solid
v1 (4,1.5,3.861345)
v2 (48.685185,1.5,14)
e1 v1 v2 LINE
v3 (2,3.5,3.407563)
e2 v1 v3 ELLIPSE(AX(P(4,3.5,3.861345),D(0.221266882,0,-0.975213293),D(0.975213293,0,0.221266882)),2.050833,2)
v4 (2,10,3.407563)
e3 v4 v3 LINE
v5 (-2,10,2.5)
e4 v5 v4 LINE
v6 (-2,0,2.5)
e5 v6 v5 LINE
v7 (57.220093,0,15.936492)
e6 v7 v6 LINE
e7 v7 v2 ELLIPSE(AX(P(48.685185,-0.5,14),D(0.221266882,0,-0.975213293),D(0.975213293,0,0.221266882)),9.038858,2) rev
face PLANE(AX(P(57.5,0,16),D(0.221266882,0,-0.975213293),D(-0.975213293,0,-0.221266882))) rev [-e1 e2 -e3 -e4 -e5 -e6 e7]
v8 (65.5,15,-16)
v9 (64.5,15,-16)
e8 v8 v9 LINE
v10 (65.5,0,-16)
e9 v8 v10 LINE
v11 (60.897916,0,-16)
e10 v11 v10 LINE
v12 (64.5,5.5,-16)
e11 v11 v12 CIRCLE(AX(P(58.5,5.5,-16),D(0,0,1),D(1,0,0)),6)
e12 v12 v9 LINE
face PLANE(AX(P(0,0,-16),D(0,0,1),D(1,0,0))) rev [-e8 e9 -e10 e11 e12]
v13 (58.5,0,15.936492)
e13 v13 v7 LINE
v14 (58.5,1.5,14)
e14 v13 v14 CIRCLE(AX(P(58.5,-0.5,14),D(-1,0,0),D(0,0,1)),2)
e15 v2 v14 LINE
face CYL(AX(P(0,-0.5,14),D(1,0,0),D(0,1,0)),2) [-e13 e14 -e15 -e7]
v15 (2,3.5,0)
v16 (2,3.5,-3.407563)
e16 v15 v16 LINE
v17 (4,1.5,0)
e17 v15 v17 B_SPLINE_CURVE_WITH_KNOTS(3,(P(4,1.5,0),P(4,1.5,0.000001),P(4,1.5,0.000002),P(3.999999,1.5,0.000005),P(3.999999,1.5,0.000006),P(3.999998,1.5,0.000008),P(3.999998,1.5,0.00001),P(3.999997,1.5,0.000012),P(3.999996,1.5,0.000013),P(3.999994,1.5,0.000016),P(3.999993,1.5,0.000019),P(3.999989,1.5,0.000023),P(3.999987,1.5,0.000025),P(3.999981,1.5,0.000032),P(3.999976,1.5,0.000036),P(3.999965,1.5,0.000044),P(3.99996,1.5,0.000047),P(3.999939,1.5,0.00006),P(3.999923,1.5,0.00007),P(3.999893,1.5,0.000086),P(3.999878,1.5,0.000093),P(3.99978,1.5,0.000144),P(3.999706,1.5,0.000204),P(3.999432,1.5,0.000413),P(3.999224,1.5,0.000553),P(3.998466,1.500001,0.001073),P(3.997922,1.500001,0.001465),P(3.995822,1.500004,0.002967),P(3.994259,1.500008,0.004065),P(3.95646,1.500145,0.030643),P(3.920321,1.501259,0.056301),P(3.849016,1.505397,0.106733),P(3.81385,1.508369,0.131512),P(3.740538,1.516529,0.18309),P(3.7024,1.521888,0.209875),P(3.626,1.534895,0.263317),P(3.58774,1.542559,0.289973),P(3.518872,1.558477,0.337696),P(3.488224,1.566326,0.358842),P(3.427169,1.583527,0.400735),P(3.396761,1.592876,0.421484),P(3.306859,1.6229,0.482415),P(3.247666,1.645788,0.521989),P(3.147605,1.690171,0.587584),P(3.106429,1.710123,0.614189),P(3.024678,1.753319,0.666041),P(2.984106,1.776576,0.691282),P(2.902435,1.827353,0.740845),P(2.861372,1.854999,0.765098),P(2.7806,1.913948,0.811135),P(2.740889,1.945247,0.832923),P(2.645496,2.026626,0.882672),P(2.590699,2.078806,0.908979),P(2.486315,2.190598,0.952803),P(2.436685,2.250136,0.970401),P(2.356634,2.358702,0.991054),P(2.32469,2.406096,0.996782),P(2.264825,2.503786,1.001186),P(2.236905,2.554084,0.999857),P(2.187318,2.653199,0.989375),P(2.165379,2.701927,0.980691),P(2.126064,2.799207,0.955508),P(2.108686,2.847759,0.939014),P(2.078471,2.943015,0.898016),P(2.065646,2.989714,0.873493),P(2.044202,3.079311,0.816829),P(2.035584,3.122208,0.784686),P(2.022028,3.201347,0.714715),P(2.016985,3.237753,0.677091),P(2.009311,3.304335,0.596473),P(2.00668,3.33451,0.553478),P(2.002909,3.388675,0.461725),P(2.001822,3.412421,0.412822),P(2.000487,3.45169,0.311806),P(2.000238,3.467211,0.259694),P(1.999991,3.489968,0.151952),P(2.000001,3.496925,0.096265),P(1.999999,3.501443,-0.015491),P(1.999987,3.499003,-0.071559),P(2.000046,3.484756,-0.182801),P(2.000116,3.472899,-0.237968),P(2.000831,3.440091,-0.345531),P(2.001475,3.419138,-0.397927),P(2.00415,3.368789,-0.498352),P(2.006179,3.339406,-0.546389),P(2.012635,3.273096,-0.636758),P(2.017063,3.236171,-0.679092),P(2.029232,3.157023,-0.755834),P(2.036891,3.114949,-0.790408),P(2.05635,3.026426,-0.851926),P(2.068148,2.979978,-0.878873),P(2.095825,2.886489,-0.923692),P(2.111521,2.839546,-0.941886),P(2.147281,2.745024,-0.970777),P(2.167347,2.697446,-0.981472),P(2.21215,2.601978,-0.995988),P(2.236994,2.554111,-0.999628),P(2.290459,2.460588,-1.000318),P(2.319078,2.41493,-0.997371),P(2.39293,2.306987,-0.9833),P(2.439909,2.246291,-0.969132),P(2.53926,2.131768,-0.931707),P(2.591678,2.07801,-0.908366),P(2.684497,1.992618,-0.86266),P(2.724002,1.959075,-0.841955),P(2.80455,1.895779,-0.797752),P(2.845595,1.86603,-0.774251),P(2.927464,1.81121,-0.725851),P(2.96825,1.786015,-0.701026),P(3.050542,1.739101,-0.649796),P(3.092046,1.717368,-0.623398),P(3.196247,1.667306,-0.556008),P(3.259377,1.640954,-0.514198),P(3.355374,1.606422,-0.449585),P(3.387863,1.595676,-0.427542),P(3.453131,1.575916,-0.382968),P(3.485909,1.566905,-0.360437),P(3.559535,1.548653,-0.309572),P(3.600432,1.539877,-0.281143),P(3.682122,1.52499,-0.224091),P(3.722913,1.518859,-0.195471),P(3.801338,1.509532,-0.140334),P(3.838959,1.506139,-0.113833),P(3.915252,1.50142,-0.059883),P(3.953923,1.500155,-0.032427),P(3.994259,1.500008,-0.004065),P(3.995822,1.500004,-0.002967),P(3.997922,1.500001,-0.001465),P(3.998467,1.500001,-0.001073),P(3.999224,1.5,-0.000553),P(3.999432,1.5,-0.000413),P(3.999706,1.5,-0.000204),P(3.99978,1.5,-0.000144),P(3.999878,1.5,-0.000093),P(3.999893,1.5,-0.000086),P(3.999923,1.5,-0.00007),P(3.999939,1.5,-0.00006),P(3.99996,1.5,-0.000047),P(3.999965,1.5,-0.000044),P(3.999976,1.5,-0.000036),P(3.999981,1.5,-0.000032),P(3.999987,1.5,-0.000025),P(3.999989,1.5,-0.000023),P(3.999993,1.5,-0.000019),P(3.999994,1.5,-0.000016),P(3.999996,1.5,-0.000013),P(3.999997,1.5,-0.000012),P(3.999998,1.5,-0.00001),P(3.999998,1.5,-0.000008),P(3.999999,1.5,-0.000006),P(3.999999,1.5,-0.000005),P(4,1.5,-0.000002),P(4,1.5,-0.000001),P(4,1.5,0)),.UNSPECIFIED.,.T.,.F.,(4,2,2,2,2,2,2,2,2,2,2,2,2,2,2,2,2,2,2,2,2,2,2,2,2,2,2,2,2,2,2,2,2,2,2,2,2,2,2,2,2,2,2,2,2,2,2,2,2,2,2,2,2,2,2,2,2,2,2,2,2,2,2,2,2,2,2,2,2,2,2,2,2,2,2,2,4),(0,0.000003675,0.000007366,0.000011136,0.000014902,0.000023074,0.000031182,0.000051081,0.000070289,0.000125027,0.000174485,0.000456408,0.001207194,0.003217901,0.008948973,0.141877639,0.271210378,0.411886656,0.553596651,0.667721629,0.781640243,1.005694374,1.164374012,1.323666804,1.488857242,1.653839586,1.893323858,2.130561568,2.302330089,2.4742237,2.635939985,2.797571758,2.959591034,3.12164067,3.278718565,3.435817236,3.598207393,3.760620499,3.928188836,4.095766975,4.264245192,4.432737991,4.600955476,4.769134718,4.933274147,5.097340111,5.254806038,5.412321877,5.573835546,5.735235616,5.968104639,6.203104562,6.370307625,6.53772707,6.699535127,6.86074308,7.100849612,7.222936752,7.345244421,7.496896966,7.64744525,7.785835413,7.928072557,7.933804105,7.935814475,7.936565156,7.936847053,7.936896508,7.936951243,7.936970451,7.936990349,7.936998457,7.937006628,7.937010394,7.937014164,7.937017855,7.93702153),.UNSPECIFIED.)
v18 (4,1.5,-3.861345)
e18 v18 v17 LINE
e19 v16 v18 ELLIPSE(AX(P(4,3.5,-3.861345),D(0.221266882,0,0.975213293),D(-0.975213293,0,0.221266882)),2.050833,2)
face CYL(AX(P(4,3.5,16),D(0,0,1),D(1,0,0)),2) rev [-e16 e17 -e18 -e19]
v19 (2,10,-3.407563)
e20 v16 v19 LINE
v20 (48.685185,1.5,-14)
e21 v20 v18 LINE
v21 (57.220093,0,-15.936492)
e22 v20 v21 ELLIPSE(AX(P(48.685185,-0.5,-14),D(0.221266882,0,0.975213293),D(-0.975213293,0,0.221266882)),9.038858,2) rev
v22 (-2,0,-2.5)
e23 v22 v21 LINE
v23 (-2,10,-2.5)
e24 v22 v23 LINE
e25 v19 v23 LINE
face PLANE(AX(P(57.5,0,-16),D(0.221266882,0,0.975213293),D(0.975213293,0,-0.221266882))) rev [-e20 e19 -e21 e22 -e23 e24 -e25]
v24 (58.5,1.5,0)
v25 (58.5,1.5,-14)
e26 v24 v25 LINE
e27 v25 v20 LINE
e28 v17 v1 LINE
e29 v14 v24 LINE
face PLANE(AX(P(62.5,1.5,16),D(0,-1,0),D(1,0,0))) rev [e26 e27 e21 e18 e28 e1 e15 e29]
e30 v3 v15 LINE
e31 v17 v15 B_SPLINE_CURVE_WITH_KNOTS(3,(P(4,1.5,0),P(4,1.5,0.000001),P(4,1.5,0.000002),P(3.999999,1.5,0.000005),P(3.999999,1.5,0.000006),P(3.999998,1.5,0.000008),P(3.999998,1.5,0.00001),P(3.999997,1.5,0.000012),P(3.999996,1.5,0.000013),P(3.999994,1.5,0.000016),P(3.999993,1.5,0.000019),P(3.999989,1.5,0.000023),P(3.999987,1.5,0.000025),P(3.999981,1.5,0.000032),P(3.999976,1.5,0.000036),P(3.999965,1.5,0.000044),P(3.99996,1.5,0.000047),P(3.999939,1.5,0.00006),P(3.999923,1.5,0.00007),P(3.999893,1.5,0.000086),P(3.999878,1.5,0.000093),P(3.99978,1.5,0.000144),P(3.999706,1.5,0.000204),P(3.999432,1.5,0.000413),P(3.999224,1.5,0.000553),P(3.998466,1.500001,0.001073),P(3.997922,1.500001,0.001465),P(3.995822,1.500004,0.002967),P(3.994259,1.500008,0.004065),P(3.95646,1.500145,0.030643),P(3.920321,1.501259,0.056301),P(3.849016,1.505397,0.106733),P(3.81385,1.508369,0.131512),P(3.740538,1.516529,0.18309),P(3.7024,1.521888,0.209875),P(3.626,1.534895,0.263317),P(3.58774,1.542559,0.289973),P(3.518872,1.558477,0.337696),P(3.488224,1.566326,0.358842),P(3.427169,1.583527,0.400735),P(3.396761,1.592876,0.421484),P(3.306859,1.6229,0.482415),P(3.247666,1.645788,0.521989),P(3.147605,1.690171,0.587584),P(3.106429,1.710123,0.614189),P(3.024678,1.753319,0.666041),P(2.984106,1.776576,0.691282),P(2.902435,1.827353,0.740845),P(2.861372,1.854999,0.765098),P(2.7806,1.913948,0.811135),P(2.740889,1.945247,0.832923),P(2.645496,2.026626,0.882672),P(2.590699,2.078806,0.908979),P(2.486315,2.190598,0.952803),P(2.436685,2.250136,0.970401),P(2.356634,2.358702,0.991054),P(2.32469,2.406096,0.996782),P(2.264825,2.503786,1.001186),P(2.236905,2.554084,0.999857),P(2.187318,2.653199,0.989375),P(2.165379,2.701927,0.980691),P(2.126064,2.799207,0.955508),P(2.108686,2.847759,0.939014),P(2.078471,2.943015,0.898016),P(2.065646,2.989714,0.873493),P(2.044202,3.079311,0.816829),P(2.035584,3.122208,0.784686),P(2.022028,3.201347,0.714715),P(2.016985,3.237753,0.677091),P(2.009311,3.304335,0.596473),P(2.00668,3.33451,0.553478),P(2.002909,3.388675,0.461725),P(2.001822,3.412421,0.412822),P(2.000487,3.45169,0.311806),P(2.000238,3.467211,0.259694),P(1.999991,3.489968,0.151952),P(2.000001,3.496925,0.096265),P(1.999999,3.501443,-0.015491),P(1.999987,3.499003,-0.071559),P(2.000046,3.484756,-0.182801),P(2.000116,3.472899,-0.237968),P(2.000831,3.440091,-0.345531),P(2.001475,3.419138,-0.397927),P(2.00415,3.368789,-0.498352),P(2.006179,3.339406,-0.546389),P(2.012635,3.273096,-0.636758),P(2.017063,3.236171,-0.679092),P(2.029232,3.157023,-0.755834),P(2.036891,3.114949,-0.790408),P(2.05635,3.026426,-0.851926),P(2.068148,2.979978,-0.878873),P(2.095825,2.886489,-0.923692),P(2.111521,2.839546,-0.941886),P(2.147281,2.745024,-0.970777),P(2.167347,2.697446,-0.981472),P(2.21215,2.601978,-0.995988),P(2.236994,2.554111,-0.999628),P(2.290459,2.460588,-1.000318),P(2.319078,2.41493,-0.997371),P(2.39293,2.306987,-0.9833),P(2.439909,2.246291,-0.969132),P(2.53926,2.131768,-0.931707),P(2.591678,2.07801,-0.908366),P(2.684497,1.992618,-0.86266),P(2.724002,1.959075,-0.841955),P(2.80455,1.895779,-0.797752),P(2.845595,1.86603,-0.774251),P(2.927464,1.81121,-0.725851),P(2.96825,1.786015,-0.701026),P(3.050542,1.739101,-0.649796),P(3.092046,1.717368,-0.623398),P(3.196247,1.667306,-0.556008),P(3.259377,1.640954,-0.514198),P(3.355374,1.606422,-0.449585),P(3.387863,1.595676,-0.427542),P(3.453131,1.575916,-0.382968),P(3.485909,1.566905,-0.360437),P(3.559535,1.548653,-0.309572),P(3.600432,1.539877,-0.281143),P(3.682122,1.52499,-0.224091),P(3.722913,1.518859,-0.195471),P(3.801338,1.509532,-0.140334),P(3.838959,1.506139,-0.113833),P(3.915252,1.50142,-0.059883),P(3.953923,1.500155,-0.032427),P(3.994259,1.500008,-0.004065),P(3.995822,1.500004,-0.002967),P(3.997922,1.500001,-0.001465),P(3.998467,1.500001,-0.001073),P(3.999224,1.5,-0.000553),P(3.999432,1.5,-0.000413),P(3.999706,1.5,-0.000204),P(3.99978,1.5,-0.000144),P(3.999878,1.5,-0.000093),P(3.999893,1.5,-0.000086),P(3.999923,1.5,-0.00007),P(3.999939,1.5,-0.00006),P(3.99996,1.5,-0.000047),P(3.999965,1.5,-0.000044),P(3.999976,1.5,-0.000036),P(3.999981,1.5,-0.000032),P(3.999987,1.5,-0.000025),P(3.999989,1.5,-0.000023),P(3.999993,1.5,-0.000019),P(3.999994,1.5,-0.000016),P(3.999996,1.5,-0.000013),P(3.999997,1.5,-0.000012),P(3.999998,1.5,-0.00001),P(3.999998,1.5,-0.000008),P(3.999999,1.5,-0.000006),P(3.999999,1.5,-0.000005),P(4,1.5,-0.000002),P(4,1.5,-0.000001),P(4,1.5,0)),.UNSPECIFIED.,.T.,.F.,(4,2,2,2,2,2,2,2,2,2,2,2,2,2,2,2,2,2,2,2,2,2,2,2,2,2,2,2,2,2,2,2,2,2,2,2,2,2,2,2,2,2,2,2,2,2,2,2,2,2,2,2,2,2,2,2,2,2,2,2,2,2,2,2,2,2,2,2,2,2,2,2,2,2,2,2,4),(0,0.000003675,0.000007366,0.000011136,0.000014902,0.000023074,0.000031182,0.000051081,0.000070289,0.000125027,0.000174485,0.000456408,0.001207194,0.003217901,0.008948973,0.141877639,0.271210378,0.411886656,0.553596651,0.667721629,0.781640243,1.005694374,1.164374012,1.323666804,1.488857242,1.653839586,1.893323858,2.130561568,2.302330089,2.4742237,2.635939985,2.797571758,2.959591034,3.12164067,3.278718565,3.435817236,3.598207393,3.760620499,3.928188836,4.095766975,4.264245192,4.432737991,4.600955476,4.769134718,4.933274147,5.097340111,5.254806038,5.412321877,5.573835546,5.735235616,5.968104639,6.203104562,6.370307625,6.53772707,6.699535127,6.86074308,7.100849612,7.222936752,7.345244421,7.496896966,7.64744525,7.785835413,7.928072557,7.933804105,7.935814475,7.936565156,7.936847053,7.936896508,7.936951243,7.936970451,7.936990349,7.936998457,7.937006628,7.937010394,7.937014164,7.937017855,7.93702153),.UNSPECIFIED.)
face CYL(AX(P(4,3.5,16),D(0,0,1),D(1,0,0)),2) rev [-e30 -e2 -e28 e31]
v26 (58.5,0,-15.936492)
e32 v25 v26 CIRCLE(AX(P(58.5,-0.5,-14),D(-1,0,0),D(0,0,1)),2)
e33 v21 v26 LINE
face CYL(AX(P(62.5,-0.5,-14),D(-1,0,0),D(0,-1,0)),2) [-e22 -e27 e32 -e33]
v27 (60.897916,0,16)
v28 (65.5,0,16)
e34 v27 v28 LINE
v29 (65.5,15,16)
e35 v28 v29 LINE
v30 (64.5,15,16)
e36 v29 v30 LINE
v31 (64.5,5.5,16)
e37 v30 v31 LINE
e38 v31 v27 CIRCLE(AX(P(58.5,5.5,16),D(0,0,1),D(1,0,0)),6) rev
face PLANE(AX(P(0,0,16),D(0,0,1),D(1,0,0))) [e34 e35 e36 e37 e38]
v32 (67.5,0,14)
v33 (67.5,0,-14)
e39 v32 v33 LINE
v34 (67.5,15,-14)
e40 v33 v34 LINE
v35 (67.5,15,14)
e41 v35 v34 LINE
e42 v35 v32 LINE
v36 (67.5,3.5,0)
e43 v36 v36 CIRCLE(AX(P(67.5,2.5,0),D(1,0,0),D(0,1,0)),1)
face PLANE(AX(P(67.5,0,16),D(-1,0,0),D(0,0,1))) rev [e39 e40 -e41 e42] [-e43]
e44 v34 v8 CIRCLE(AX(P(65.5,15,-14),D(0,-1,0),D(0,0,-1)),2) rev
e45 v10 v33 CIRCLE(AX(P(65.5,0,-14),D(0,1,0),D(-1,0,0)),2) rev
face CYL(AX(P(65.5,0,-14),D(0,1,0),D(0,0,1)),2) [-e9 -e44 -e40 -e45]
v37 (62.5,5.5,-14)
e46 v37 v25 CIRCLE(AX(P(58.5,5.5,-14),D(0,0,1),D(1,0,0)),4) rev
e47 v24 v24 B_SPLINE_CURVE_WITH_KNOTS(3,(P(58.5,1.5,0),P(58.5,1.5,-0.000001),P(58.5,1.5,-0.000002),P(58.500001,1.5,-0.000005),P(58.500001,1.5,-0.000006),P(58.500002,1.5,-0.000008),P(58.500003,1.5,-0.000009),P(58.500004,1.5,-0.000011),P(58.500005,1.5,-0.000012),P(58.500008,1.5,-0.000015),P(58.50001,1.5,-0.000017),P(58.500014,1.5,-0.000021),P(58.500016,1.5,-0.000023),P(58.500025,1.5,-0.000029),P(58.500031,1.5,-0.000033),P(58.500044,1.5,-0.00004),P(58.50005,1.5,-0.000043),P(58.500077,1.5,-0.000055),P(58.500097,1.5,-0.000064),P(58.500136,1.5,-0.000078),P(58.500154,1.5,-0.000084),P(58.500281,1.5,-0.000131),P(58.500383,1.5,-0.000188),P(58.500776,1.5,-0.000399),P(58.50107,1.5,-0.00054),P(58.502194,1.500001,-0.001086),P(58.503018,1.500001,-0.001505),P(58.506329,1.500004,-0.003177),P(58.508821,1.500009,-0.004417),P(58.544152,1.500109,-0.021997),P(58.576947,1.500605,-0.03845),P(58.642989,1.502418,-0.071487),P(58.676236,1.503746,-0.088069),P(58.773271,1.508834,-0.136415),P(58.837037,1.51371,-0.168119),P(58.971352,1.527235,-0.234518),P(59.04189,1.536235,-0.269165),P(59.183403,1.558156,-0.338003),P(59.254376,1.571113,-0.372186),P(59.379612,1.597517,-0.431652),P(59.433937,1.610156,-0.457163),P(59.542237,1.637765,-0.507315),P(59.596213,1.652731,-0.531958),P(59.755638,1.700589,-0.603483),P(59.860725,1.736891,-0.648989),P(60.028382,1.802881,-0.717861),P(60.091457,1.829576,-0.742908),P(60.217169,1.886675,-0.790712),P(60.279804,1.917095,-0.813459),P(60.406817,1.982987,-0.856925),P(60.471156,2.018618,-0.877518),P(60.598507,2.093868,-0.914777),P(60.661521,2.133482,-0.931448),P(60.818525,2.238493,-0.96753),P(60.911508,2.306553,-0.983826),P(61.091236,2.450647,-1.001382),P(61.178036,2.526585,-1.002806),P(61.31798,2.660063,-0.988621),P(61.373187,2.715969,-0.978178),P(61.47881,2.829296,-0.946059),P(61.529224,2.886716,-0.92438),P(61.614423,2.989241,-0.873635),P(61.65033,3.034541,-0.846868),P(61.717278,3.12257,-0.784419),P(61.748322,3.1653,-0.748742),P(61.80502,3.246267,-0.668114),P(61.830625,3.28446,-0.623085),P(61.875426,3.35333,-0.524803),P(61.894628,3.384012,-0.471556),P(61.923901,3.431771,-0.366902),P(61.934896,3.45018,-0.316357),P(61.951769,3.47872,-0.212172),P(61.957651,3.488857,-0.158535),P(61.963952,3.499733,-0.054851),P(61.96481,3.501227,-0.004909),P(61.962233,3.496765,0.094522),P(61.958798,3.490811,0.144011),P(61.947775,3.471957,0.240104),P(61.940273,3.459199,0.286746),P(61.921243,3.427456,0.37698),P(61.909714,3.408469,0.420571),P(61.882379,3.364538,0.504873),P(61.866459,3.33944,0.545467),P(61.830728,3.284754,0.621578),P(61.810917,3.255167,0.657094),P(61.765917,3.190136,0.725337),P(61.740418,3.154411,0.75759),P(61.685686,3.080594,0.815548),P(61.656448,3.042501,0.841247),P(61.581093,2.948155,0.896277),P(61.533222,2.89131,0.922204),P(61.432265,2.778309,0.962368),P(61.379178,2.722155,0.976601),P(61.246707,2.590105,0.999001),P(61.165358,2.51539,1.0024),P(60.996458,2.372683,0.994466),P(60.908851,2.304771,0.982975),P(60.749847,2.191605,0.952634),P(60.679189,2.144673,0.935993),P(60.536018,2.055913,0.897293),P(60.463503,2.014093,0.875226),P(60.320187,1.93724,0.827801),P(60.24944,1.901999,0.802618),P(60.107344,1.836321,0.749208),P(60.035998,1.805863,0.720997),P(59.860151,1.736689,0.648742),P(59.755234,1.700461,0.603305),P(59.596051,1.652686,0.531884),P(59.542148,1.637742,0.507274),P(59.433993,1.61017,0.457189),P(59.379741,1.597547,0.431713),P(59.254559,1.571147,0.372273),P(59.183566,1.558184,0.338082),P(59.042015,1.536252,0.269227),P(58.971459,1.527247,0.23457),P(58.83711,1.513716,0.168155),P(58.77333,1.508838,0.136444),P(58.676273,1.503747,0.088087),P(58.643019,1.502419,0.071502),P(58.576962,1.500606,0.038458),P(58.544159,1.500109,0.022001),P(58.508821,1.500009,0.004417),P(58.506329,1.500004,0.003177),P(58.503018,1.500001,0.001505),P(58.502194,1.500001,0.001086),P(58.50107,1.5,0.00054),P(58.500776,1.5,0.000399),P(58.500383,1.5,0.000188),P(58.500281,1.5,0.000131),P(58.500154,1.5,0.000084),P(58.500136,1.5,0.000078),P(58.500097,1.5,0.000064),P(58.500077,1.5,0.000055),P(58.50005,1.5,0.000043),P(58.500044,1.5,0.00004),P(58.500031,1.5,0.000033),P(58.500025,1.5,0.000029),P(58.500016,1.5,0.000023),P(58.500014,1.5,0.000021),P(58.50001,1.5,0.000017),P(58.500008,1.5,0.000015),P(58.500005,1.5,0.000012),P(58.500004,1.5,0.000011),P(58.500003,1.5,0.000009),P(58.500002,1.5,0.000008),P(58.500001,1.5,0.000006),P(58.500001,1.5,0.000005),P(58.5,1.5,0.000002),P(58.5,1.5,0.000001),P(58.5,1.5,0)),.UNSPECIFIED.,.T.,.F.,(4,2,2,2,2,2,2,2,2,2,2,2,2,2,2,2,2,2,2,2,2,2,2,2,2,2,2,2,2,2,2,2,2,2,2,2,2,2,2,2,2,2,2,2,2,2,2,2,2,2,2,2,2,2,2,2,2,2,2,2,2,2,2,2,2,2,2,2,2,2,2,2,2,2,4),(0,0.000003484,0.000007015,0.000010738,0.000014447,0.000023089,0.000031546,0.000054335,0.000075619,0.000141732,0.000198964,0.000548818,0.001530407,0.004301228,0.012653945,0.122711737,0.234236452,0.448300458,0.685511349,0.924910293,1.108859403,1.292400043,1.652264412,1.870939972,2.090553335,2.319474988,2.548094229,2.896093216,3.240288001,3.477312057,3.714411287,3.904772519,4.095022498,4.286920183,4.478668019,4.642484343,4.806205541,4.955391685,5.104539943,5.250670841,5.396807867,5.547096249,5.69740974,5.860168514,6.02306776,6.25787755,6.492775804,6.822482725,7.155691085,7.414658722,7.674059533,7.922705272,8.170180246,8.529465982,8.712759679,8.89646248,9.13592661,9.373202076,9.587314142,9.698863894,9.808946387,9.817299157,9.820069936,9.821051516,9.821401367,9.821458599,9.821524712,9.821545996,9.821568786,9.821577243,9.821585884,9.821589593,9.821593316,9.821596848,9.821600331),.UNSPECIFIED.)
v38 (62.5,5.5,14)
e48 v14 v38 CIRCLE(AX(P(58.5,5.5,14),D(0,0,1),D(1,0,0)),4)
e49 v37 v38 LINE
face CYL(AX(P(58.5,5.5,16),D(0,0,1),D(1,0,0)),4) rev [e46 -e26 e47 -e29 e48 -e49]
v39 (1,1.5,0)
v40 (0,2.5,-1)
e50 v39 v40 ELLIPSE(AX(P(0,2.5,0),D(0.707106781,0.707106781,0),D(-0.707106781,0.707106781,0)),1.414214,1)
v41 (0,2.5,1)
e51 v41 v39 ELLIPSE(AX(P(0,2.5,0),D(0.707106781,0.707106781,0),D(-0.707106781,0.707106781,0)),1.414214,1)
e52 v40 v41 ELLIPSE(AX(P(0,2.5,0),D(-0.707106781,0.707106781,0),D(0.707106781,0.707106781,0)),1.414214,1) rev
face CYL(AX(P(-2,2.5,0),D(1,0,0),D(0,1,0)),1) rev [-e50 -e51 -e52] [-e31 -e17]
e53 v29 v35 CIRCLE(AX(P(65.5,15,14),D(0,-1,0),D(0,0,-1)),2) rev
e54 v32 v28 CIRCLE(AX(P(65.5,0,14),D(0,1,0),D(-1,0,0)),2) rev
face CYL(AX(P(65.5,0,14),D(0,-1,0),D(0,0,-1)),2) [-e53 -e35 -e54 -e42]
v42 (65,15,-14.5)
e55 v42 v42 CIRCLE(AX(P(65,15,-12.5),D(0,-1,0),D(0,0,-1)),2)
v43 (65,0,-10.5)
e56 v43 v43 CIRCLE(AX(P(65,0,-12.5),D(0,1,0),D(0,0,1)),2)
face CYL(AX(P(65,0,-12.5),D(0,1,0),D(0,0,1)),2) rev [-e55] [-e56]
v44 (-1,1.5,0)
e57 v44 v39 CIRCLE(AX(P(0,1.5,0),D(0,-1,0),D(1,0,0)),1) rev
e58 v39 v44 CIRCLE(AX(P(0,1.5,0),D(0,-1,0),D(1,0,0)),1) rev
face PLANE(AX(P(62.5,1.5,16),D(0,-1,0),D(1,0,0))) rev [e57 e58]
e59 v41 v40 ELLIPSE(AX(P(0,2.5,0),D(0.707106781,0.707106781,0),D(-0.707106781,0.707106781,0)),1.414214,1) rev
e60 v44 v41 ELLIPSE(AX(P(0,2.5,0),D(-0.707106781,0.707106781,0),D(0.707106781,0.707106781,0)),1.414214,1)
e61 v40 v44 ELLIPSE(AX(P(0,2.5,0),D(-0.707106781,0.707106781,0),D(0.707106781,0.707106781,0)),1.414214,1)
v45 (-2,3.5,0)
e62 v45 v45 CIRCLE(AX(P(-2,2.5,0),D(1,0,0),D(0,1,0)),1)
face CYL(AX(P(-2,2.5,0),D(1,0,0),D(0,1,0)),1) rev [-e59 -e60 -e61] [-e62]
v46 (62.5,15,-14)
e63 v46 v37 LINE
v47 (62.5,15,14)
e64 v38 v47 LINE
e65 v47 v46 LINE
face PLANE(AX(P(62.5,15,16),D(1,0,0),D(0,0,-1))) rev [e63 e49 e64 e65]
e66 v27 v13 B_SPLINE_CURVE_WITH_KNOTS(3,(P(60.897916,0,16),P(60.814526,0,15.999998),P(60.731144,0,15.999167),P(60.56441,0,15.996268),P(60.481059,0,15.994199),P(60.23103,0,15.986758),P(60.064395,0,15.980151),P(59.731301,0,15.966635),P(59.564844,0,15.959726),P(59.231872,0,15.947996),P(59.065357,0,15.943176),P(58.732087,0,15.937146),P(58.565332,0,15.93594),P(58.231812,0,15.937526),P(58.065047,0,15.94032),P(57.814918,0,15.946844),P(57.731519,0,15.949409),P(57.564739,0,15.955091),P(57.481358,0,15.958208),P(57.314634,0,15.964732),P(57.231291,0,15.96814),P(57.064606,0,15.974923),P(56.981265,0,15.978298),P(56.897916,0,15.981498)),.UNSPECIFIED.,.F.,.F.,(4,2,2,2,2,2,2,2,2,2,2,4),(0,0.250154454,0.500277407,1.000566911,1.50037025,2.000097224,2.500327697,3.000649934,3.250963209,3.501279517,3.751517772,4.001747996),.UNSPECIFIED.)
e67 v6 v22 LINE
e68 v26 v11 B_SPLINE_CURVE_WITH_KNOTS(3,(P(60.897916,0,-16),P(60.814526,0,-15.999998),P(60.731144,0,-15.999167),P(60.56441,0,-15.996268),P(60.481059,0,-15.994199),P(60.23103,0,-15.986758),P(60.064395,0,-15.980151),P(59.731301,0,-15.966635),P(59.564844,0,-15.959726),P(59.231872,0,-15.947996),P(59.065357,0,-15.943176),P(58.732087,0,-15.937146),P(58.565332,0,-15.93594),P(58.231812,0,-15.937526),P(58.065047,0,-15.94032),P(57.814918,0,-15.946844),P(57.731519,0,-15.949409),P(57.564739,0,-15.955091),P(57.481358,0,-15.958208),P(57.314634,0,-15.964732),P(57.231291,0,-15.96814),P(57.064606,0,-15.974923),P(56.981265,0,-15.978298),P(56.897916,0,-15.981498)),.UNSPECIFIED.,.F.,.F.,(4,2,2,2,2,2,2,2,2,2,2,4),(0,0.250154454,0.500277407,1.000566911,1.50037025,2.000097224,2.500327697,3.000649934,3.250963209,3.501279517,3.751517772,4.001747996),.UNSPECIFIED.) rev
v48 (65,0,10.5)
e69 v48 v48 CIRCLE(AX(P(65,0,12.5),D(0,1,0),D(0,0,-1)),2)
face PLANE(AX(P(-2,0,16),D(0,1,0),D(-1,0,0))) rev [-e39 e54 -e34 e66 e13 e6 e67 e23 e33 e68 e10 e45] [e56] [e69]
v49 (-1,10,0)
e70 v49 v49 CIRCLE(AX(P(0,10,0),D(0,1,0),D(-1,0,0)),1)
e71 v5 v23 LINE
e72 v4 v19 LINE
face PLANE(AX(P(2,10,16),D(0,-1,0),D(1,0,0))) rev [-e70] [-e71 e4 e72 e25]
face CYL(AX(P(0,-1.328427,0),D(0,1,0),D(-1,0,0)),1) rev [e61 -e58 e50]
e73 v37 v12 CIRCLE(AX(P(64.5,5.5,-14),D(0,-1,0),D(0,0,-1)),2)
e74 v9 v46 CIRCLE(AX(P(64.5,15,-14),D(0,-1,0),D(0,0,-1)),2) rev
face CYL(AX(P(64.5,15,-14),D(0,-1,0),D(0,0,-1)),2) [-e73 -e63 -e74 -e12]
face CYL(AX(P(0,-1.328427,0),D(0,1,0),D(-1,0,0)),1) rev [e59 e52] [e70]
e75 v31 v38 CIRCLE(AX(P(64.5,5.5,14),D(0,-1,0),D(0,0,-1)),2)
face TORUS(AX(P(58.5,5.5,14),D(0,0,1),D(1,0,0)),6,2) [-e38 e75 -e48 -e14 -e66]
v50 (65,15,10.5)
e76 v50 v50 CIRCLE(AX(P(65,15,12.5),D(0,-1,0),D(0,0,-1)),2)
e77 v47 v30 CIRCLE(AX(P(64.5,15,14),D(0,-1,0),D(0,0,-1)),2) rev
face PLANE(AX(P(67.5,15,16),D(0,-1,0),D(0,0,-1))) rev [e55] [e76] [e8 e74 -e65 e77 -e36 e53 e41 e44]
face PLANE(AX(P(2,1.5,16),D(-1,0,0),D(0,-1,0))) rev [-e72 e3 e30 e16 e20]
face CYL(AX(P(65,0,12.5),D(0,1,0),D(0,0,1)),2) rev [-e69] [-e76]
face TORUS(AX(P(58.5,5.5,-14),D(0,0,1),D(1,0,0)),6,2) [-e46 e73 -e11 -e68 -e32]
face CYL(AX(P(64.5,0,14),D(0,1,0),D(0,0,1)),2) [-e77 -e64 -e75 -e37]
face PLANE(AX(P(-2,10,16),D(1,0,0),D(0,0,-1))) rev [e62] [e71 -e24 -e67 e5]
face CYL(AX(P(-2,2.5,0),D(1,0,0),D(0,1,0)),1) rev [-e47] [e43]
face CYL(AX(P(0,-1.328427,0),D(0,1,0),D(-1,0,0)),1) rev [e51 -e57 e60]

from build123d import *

# Parameters (mm, degrees)
BOSS_EXTRUDE1_DEPTH     = 16
CUT_EXTRUDE1_DEPTH      = 71.973586636
CUT_EXTRUDE1_DEPTH_BACK = 71.973586636
SKETCH2_R               = 2
SKETCH3_R               = 1
CUT_EXTRUDE2_DEPTH      = 8.5
FILLET4_R               = 4
CUT_EXTRUDE3_DEPTH      = 70.074235428
CUT_EXTRUDE3_DEPTH_BACK = 70.074235428
SKETCH4_R               = 1
CUT_EXTRUDE4_DEPTH      = 71.671776663
CUT_EXTRUDE4_DEPTH_BACK = 71.671776663
FILLET1_R               = 2


with BuildPart() as part:
    # Sketch1 → Boss-Extrude1 (new, symmetric)
    with BuildSketch(Plane.XY):
        Polygon((-2, 10), (-2, 0), (67.5, 0), (67.5, 15), (62.5, 15), (62.5, 1.5), (2, 1.5), (2, 10), align=None)
    extrude(amount=BOSS_EXTRUDE1_DEPTH, both=True)

    # Sketch2 → Cut-Extrude1 (cut, two sides: drawn at the far end of the back side and taken through both)
    with BuildSketch(Plane(origin=(0, 15, 0), x_dir=(1, 0, 0), z_dir=(0, 1, 0)).offset(-CUT_EXTRUDE1_DEPTH_BACK)):
        with Locations(Location((65, 12.5, 0), (0, 0, 270))):
            Circle(SKETCH2_R)
        with Locations(Location((65, -12.5, 0), (0, 0, 90))):
            Circle(SKETCH2_R)
    extrude(amount=CUT_EXTRUDE1_DEPTH + CUT_EXTRUDE1_DEPTH_BACK, mode=Mode.SUBTRACT)

    # Sketch3 → Cut-Extrude2 (cut)
    with BuildSketch(Plane(origin=(0, 10, 0), x_dir=(1, 0, 0), z_dir=(0, 1, 0))):
        with Locations(Location((0, 0, 0), (0, 0, 180))):
            Circle(SKETCH3_R)
    extrude(amount=-CUT_EXTRUDE2_DEPTH, mode=Mode.SUBTRACT)

    # Fillet4
    fillet4_edges = [part.edges().sort_by_distance(p)[0] for p in [
        (62.5, 1.5, 0),
    ]]
    fillet(fillet4_edges, radius=FILLET4_R)

    # Sketch4 → Cut-Extrude3 (cut, two sides: drawn at the far end of the back side and taken through both)
    with BuildSketch(Plane(origin=(2, 0, 0), x_dir=(0, 0, -1), z_dir=(1, 0, 0)).offset(-CUT_EXTRUDE3_DEPTH_BACK)):
        with Locations(Location((0, 2.5, 0), (0, 0, 90))):
            Circle(SKETCH4_R)
    extrude(amount=CUT_EXTRUDE3_DEPTH + CUT_EXTRUDE3_DEPTH_BACK, mode=Mode.SUBTRACT)

    # Sketch5 → Cut-Extrude4 (cut, two sides: drawn at the far end of the back side and taken through both)
    with BuildSketch(Plane(origin=(0, 1.5, 0), x_dir=(1, 0, 0), z_dir=(0, 1, 0)).offset(-CUT_EXTRUDE4_DEPTH_BACK)):
        Polygon((57.5, 16), (-2, 2.5), (-2, 16), align=None)
        Polygon((57.5, -16), (-2, -2.5), (-2, -16), align=None)
    extrude(amount=CUT_EXTRUDE4_DEPTH + CUT_EXTRUDE4_DEPTH_BACK, mode=Mode.SUBTRACT)

    # Fillet1
    # the kernel refuses this fillet: 2 mm, written as the material it adds along each edge
    with BuildSketch(Plane(origin=(2, 1.5, 8.407563025), x_dir=(1, 0, 0), z_dir=(0, 0, -1))) as fillet1_piece_1_section:
        with BuildLine():
            CenterArc((FILLET1_R, -FILLET1_R), FILLET1_R, 90, 90)
            Line((0, -FILLET1_R), (0, 0))
            Line((0, 0), (FILLET1_R, 0))
        make_face()
    fillet1_piece_1 = extrude(amount=8.407563034, mode=Mode.PRIVATE)
    fillet1_piece_1 = split(fillet1_piece_1, bisect_by=Plane(origin=(3.078912021, 1.5, 3.65235819), z_dir=(0.2212668816339037, 0, -0.9752132931272052)), keep=Keep.TOP, mode=Mode.PRIVATE)
    fillet1_piece_1 = fillet1_piece_1 - Plane(origin=(2, 2.5, 0), x_dir=(0, 1, 0), z_dir=(1, 0, 0)) * Cylinder(1, 25, mode=Mode.PRIVATE)
    add(fillet1_piece_1)
    with BuildSketch(Plane(origin=(2, 1.5, -9e-09), x_dir=(1, 0, 0), z_dir=(0, 0, -1))) as fillet1_piece_2_section:
        with BuildLine():
            CenterArc((FILLET1_R, -FILLET1_R), FILLET1_R, 90, 90)
            Line((0, -FILLET1_R), (0, 0))
            Line((0, 0), (FILLET1_R, 0))
        make_face()
    fillet1_piece_2 = extrude(amount=8.407563016, mode=Mode.PRIVATE)
    fillet1_piece_2 = split(fillet1_piece_2, bisect_by=Plane(origin=(1.26470786, 1.5, -3.240732035), z_dir=(0.2212668816339037, 0, 0.9752132931272052)), keep=Keep.TOP, mode=Mode.PRIVATE)
    fillet1_piece_2 = fillet1_piece_2 - Plane(origin=(2, 2.5, 0), x_dir=(0, 1, 0), z_dir=(1, 0, 0)) * Cylinder(1, 25, mode=Mode.PRIVATE)
    add(fillet1_piece_2)
    # the kernel refuses this fillet: 2 mm, written as the material it takes off along each edge
    with BuildSketch(Plane(origin=(67.5, -5, -16), x_dir=(-1, 0, 0), z_dir=(0, 1, 0)), Plane(origin=(67.5, -5, 16), x_dir=(0, 0, -1), z_dir=(0, 1, 0))) as fillet1_2_piece_1:
        with BuildLine():
            CenterArc((FILLET1_R, FILLET1_R), FILLET1_R, 180, 90)
            Line((0, FILLET1_R), (0, 0))
            Line((0, 0), (FILLET1_R, 0))
        make_face()
    extrude(amount=25, mode=Mode.SUBTRACT)
    with BuildSketch(Plane(origin=(62.5, 20, -16), x_dir=(1, 0, 0), z_dir=(0, -1, 0)), Plane(origin=(62.5, 20, 16), x_dir=(0, 0, -1), z_dir=(0, -1, 0))) as fillet1_2_piece_2:
        with BuildLine():
            CenterArc((FILLET1_R, FILLET1_R), FILLET1_R, 180, 90)
            Line((0, FILLET1_R), (0, 0))
            Line((0, 0), (FILLET1_R, 0))
        make_face()
    extrude(amount=14.5, mode=Mode.SUBTRACT)
    with BuildSketch(Plane(origin=(58.5, 1.5, -16), x_dir=(0, -1, 0), z_dir=(-1, 0, 0)), Plane(origin=(58.5, 1.5, 16), x_dir=(0, 0, -1), z_dir=(-1, 0, 0))) as fillet1_2_piece_3:
        with BuildLine():
            CenterArc((FILLET1_R, FILLET1_R), FILLET1_R, 180, 90)
            Line((0, FILLET1_R), (0, 0))
            Line((0, 0), (FILLET1_R, 0))
        make_face()
    extrude(amount=16, mode=Mode.SUBTRACT)
    with BuildSketch(Plane(origin=(58.5, 5.5, -16), x_dir=(1, 0, 0), z_dir=(0, 1, 0))) as fillet1_2_piece_4:
        with BuildLine():
            CenterArc((4 + FILLET1_R, -FILLET1_R), FILLET1_R, 90, 90)
            Line((4, -FILLET1_R), (4, 0))
            Line((4, 0), (4 + FILLET1_R, 0))
        make_face()
    revolve(axis=Axis((58.5, 5.5, -16), (0, 0, -1)), revolution_arc=90, mode=Mode.SUBTRACT)
    with BuildSketch(Plane(origin=(58.5, 5.5, 16), x_dir=(1, 0, 0), z_dir=(0, 1, 0))) as fillet1_2_piece_5:
        with BuildLine():
            CenterArc((4 + FILLET1_R, FILLET1_R), FILLET1_R, 180, 90)
            Line((4 + FILLET1_R, 0), (4, 0))
            Line((4, 0), (4, FILLET1_R))
        make_face()
    revolve(axis=Axis((58.5, 5.5, 16), (0, 0, -1)), revolution_arc=90, mode=Mode.SUBTRACT)


solid = part.part
